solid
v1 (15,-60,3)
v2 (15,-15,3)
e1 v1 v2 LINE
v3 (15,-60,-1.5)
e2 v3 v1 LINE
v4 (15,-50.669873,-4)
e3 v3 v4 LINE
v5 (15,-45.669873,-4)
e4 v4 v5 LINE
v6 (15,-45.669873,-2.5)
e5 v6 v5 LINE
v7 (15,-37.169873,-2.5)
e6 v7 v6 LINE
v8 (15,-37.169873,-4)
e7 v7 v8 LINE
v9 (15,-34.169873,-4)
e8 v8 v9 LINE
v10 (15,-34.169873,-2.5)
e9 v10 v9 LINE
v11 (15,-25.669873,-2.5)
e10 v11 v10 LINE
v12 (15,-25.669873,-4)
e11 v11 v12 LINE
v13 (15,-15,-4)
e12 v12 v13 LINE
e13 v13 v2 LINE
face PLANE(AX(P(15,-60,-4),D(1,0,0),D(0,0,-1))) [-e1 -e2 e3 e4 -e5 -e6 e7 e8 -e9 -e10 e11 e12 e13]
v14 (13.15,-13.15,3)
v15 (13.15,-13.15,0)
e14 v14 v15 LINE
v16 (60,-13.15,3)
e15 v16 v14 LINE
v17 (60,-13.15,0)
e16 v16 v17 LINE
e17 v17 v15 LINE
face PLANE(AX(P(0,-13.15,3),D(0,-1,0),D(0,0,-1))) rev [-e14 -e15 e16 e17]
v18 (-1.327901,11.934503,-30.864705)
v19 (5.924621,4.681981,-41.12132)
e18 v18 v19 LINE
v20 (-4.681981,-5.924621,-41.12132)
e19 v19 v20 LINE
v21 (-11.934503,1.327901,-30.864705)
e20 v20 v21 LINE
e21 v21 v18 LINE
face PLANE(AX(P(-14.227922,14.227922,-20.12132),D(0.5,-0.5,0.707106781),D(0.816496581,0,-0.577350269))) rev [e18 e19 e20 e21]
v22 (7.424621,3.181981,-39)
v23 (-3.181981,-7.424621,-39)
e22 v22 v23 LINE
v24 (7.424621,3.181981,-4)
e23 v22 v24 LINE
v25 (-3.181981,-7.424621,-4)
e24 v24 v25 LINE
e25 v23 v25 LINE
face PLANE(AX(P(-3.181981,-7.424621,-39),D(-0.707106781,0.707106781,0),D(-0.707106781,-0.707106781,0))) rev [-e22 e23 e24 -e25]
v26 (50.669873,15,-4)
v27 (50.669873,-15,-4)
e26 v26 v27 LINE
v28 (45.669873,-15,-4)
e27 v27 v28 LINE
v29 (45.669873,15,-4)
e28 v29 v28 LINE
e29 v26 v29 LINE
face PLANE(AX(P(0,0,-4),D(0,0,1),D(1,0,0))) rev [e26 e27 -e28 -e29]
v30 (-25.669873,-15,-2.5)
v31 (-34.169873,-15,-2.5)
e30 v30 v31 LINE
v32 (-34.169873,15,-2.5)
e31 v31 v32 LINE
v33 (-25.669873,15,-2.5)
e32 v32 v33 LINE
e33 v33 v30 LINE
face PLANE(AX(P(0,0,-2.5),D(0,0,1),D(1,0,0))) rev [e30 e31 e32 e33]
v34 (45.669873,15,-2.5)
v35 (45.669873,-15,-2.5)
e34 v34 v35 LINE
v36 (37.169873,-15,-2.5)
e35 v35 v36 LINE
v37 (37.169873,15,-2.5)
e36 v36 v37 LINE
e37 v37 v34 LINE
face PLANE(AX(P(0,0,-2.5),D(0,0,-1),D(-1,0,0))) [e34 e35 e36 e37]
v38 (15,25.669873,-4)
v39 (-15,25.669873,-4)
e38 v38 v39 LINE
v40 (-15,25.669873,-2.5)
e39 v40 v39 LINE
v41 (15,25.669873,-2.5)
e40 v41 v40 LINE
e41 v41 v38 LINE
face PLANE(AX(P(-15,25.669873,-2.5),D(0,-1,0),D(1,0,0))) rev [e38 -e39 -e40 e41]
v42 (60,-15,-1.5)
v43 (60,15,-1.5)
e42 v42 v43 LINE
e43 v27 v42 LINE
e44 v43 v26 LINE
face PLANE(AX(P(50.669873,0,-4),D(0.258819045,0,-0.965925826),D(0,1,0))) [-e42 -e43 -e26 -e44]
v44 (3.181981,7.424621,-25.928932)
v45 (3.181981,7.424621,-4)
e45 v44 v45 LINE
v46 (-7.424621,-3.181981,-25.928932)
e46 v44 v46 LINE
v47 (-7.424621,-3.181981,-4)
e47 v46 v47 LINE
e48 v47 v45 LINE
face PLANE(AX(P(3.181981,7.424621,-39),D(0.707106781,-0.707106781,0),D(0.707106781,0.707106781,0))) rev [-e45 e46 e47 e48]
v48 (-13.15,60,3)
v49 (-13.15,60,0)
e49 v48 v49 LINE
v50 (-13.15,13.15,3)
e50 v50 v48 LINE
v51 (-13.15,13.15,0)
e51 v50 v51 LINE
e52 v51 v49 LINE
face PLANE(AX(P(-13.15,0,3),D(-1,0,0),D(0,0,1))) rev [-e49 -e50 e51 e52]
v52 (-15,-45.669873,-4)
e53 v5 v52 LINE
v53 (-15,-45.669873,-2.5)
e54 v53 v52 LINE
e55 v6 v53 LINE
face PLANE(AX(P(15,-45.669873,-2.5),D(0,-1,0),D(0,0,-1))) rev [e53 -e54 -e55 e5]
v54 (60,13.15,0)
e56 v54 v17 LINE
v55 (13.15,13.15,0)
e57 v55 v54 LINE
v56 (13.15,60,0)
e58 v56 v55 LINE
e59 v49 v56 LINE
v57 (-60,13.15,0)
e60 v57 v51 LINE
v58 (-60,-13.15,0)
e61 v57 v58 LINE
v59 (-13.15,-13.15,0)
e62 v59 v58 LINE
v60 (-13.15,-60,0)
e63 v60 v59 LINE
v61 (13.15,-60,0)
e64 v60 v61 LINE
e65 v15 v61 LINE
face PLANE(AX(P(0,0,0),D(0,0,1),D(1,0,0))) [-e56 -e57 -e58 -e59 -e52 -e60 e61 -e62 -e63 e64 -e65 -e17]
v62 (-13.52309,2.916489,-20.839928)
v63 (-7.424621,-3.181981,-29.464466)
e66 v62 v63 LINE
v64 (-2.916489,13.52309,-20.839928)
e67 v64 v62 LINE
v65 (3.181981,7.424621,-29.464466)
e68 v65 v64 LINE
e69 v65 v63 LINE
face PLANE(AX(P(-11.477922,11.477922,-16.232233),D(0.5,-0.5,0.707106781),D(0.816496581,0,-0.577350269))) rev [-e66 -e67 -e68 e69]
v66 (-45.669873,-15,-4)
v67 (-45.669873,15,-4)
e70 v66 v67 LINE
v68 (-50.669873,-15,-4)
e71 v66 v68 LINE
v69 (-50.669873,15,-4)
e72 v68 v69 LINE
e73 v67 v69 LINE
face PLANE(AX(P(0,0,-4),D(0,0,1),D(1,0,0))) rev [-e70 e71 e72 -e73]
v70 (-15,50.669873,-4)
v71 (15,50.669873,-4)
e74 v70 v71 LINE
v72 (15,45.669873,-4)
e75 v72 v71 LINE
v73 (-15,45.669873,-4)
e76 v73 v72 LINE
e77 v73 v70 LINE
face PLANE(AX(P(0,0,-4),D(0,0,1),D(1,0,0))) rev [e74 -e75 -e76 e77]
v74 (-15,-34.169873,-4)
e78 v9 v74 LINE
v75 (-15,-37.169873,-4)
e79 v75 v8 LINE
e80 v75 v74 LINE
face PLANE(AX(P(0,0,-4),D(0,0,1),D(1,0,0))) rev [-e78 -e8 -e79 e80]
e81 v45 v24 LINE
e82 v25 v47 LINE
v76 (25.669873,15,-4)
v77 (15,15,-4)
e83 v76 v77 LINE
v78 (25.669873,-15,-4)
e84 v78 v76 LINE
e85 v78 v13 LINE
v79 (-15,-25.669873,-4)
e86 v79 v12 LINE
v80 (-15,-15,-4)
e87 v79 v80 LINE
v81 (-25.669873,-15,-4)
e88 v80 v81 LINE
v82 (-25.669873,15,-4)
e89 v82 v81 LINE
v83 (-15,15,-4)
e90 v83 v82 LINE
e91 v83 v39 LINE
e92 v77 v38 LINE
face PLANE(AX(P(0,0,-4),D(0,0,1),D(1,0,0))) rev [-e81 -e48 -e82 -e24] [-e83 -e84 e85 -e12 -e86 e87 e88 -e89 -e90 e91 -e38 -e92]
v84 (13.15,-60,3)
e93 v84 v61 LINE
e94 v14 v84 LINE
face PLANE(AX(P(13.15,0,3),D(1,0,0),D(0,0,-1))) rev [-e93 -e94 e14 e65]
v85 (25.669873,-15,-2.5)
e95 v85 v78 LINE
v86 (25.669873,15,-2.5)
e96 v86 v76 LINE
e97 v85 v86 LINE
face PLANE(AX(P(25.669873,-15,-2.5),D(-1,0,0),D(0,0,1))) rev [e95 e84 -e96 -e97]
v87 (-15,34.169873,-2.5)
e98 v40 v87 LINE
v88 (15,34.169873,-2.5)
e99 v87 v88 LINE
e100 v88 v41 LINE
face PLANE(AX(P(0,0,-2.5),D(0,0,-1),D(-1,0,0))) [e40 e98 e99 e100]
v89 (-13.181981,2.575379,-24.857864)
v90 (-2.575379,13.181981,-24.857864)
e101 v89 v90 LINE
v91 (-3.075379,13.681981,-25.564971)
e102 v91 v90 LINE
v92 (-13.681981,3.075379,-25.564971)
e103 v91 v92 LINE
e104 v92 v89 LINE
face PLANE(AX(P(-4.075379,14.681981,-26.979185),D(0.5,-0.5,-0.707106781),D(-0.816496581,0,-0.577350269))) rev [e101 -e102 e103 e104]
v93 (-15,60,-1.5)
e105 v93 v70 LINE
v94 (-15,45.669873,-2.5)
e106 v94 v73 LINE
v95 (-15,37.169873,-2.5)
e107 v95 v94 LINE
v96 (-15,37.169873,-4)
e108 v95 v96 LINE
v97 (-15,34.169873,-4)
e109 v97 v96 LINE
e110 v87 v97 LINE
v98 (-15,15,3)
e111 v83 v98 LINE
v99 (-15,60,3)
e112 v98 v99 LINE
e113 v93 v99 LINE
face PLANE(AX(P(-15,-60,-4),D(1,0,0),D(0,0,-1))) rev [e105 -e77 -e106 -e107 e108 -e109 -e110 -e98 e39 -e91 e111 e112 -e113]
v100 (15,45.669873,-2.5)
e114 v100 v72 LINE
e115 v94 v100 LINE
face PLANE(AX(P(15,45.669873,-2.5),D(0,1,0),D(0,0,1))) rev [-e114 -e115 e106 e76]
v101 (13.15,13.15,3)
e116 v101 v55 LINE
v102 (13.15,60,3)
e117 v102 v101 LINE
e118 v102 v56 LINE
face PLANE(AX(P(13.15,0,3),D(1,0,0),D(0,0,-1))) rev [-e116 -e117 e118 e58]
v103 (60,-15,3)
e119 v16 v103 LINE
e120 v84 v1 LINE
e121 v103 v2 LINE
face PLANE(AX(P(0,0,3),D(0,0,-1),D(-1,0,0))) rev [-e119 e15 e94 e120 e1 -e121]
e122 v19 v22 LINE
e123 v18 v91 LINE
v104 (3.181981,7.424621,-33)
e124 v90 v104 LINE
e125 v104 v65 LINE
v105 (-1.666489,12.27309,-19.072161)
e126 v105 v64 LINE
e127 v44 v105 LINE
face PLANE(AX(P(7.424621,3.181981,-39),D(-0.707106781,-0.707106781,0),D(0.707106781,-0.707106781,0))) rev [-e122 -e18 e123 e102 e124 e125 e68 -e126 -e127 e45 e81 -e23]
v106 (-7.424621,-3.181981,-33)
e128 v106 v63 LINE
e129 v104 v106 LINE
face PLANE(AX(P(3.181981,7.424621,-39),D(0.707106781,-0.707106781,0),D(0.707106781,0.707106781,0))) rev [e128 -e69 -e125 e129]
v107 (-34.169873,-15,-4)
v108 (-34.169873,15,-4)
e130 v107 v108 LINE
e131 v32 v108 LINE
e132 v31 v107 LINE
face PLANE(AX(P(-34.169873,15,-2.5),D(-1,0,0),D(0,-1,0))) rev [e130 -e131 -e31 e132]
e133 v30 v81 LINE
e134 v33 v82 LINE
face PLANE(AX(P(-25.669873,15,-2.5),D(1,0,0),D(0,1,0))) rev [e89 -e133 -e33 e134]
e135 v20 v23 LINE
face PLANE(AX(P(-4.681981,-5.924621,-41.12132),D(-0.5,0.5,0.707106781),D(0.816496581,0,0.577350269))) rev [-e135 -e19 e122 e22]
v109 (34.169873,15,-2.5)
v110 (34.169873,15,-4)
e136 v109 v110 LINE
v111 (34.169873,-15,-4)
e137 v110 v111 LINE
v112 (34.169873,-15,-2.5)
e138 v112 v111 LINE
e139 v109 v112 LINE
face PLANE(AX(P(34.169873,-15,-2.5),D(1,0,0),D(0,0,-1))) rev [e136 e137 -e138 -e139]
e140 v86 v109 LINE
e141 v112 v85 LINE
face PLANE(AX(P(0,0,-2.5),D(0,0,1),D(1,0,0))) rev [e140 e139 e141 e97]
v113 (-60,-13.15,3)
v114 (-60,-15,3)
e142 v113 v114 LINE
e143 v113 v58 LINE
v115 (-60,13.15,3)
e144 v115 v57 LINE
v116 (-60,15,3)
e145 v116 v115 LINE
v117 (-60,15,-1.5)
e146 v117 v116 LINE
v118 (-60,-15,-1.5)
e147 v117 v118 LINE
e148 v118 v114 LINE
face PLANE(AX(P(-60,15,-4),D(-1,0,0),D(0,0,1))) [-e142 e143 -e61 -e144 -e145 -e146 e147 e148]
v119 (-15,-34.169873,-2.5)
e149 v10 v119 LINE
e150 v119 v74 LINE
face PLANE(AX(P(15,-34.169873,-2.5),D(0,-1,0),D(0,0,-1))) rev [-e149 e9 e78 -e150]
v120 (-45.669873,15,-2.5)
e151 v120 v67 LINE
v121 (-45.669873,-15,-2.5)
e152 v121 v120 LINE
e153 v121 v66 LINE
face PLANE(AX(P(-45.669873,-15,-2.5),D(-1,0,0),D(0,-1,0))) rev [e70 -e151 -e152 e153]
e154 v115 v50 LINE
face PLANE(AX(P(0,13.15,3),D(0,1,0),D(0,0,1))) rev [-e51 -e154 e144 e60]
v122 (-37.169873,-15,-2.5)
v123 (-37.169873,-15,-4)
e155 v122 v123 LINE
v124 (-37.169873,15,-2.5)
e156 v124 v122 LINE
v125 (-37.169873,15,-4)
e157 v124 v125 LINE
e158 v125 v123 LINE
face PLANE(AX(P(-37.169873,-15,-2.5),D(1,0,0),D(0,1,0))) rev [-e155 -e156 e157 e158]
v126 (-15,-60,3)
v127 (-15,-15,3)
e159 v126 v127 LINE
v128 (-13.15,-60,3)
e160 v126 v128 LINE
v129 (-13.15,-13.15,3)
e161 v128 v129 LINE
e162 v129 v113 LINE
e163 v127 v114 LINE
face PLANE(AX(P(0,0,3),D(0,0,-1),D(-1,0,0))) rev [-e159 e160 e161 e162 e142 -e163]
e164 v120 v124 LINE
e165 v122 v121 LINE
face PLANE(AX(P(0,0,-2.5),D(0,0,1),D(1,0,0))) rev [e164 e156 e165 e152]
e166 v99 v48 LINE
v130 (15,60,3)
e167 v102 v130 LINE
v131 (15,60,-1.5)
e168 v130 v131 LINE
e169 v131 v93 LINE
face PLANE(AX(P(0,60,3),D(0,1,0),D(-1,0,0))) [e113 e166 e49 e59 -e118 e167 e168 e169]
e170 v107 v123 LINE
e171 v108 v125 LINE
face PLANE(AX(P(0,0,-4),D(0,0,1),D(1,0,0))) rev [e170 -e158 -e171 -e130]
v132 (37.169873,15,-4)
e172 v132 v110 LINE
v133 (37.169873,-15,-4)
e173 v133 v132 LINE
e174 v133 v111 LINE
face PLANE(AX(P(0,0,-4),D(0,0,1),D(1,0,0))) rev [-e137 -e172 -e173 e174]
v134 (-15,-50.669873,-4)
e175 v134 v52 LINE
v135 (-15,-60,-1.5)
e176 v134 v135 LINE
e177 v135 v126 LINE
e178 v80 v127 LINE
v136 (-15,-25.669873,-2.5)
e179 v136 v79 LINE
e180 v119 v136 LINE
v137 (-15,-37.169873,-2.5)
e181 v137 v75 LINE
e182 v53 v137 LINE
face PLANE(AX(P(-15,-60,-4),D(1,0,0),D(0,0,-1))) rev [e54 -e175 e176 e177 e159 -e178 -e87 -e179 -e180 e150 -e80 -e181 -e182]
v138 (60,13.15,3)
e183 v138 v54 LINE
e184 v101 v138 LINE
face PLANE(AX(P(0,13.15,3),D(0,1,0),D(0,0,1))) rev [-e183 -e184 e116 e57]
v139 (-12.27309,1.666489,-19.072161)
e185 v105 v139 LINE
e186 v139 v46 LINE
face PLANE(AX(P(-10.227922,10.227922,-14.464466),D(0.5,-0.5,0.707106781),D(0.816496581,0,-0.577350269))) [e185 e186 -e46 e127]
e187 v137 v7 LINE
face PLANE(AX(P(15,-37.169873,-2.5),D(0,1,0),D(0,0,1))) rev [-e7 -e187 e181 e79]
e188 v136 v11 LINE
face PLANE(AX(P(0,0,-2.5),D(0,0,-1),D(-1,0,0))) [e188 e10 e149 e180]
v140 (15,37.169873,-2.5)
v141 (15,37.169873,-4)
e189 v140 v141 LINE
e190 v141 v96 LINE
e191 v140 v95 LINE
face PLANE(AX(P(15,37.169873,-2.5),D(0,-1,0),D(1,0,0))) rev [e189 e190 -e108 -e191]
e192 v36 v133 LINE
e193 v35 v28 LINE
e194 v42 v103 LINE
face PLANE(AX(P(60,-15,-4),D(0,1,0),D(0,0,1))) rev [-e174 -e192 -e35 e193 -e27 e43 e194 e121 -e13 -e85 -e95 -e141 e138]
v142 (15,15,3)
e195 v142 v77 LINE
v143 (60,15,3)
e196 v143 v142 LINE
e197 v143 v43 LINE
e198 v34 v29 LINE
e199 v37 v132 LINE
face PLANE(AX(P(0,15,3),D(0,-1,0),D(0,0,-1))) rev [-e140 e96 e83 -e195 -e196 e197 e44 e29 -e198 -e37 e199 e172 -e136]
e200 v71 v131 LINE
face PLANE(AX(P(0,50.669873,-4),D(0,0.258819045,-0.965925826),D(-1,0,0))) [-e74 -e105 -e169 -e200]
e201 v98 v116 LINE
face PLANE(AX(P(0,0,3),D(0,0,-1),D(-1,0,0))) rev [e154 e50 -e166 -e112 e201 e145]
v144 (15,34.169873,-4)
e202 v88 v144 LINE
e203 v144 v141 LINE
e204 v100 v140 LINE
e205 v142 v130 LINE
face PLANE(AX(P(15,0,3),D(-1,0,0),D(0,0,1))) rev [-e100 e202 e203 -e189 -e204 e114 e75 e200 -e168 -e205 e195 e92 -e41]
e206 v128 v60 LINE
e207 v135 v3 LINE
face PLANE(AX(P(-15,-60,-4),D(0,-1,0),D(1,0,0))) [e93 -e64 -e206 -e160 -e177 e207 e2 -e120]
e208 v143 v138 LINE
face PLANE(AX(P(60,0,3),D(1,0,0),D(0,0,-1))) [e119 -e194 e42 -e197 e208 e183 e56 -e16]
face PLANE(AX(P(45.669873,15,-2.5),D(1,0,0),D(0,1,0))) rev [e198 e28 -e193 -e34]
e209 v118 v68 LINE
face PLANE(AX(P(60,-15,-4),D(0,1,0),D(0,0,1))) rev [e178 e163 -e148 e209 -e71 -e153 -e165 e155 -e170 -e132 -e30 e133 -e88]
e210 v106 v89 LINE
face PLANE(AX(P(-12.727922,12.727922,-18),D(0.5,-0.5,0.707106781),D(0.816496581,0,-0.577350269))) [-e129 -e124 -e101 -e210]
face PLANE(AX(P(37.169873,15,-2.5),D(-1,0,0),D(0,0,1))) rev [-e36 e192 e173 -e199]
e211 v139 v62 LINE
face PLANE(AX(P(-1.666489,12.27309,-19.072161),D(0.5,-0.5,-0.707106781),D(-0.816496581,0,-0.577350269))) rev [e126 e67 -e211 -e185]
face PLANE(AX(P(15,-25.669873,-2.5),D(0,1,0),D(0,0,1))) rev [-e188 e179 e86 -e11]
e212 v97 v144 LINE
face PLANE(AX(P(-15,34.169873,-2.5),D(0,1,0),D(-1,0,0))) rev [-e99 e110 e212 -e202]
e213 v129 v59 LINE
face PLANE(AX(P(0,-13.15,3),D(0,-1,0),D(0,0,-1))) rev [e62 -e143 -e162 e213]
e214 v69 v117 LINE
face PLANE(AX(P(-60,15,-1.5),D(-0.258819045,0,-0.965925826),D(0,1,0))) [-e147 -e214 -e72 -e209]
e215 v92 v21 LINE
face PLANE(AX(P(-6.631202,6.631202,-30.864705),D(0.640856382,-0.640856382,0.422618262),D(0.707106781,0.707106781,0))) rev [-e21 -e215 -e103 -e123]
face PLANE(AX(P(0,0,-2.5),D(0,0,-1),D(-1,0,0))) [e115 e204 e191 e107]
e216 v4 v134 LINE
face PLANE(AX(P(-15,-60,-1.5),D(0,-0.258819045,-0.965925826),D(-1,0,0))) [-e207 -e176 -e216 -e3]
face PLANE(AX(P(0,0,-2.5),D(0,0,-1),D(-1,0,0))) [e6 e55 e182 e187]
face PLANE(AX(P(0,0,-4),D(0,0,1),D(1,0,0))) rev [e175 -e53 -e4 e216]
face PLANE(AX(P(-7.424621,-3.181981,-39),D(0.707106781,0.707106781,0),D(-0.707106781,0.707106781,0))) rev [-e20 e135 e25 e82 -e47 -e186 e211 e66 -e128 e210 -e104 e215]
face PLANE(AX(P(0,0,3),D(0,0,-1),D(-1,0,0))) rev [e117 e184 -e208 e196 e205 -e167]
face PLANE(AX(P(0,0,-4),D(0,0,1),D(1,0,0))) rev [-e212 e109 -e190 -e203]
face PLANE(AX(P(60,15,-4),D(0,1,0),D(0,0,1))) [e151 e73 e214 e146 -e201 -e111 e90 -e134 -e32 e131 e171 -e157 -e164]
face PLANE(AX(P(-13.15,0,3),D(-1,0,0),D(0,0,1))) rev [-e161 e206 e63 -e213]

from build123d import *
from OCP.BRepFilletAPI import BRepFilletAPI_MakeChamfer

# Parameters (mm, degrees)
SKETCH1_W           = 1.85
SKETCH1_H           = 38.85
SKETCH1_H_2         = 6.15
SKETCH1_W_2         = 44.85
SKETCH1_H_3         = 1.85
SKETCH1_W_3         = 0.15
BOSS_EXTRUDE1_DEPTH = 3
SKETCH1_4_W         = 120
SKETCH1_4_H         = 30
SKETCH1_4_W_2       = 30
SKETCH1_4_H_2       = 120
BOSS_EXTRUDE3_DEPTH = 4
CHAMFER1_SIZE       = 2.5
CHAMFER1_SIZE2      = 9.330127019
SKETCH4_W           = 8.5
SKETCH4_H           = 30
SKETCH4_W_2         = 30
SKETCH4_H_2         = 8.5
CUT_EXTRUDE1_DEPTH  = 1.5
BOSS_EXTRUDE4_DEPTH = 35
CHAMFER2_SIZE       = 6
BOSS_EXTRUDE5_DEPTH = 3
CHAMFER3_SIZE       = 2
CHAMFER3_SIZE2      = 5.494954839
BOSS_EXTRUDE6_DEPTH = 2.5


with BuildPart() as part:
    # Sketch1 → Boss-Extrude1 (new body)
    with BuildSketch(Plane(origin=(0, 0, 0), x_dir=(-1, 0, 0), z_dir=(0, 0, -1))):
        with Locations((14.075, 40.575)):
            Rectangle(SKETCH1_W, SKETCH1_H)
        with Locations((14.075, 18.075)):
            Rectangle(SKETCH1_W, SKETCH1_H_2)
        with Locations((37.575, 14.075)):
            Rectangle(SKETCH1_W_2, SKETCH1_H_3)
        with Locations((14.075, 14.075)):
            Rectangle(SKETCH1_W, SKETCH1_H_3)
        with Locations((14.075, -14.075)):
            Rectangle(SKETCH1_W, SKETCH1_H_3)
        with Locations((14.075, -18.075)):
            Rectangle(SKETCH1_W, SKETCH1_H_2)
        with Locations((37.575, -14.075)):
            Rectangle(SKETCH1_W_2, SKETCH1_H_3)
        with Locations((14.075, -40.575)):
            Rectangle(SKETCH1_W, SKETCH1_H)
        with Locations((-14.075, -14.075)):
            Rectangle(SKETCH1_W, SKETCH1_H_3)
        with Locations((-14.075, -18.075)):
            Rectangle(SKETCH1_W, SKETCH1_H_2)
        with Locations((-37.575, -14.075)):
            Rectangle(SKETCH1_W_2, SKETCH1_H_3)
        with Locations((-15.075, -14.075)):
            Rectangle(SKETCH1_W_3, SKETCH1_H_3)
        with Locations((15.075, -14.075)):
            Rectangle(SKETCH1_W_3, SKETCH1_H_3)
        with Locations((15.075, 14.075)):
            Rectangle(SKETCH1_W_3, SKETCH1_H_3)
        with Locations((-37.575, 14.075)):
            Rectangle(SKETCH1_W_2, SKETCH1_H_3)
        with Locations((-15.075, 14.075)):
            Rectangle(SKETCH1_W_3, SKETCH1_H_3)
        with Locations((-14.075, 18.075)):
            Rectangle(SKETCH1_W, SKETCH1_H_2)
        with Locations((-14.075, 14.075)):
            Rectangle(SKETCH1_W, SKETCH1_H_3)
        with Locations((-14.075, 40.575)):
            Rectangle(SKETCH1_W, SKETCH1_H)
        with Locations((-14.075, -40.575)):
            Rectangle(SKETCH1_W, SKETCH1_H)
    extrude(amount=-BOSS_EXTRUDE1_DEPTH)

    # Sketch1<4> → Boss-Extrude3 (add)
    with BuildSketch(Plane(origin=(0, 0, 0), x_dir=(-1, 0, 0), z_dir=(0, 0, -1))):
        Rectangle(SKETCH1_4_W, SKETCH1_4_H)
        Rectangle(SKETCH1_4_W_2, SKETCH1_4_H_2)
    extrude(amount=BOSS_EXTRUDE3_DEPTH)

    # Chamfer1: one chamfer whose edges measure the first distance from different faces: ONE call of the kernel's chamfer builder (chamfer() names one face for all edges)
    chamfer1_edges_1 = [part.edges().sort_by_distance(p)[0] for p in [
        (60, 0, -4),
    ]]
    chamfer1_side_1 = [part.faces().sort_by_distance(p)[0] for p in [
        (60, 0, -1.703661327),
    ]]
    chamfer1_edges_2 = [part.edges().sort_by_distance(p)[0] for p in [
        (0, 60, -4),
    ]]
    chamfer1_side_2 = [part.faces().sort_by_distance(p)[0] for p in [
        (0, 60, -1.703661327),
    ]]
    chamfer1_edges_3 = [part.edges().sort_by_distance(p)[0] for p in [
        (0, -60, -4),
    ]]
    chamfer1_side_3 = [part.faces().sort_by_distance(p)[0] for p in [
        (0, -60, -1.703661327),
    ]]
    chamfer1_edges_4 = [part.edges().sort_by_distance(p)[0] for p in [
        (-60, 0, -4),
    ]]
    chamfer1_side_4 = [part.faces().sort_by_distance(p)[0] for p in [
        (-60, 0, -1.703661327),
    ]]
    chamfer1 = BRepFilletAPI_MakeChamfer(part.part.solid().wrapped)
    for e in chamfer1_edges_1:
        chamfer1.Add(CHAMFER1_SIZE, CHAMFER1_SIZE2, e.wrapped, chamfer1_side_1[0].wrapped)  # the first distance lies on this face
    for e in chamfer1_edges_2:
        chamfer1.Add(CHAMFER1_SIZE, CHAMFER1_SIZE2, e.wrapped, chamfer1_side_2[0].wrapped)  # the first distance lies on this face
    for e in chamfer1_edges_3:
        chamfer1.Add(CHAMFER1_SIZE, CHAMFER1_SIZE2, e.wrapped, chamfer1_side_3[0].wrapped)  # the first distance lies on this face
    for e in chamfer1_edges_4:
        chamfer1.Add(CHAMFER1_SIZE, CHAMFER1_SIZE2, e.wrapped, chamfer1_side_4[0].wrapped)  # the first distance lies on this face
    add(Compound.cast(chamfer1.Shape()), mode=Mode.REPLACE)

    # Sketch4 → Cut-Extrude1 (cut)
    with BuildSketch(Plane(origin=(0, 0, -4), x_dir=(-1, 0, 0), z_dir=(0, 0, -1))):
        with Locations((-41.419872981, 0)):
            Rectangle(SKETCH4_W, SKETCH4_H)
        with Locations((-29.919872981, 0)):
            Rectangle(SKETCH4_W, SKETCH4_H)
        with Locations((0, 41.419872981)):
            Rectangle(SKETCH4_W_2, SKETCH4_H_2)
        with Locations((0, 29.919872981)):
            Rectangle(SKETCH4_W_2, SKETCH4_H_2)
        with Locations((29.919872981, 0)):
            Rectangle(SKETCH4_W, SKETCH4_H)
        with Locations((41.419872981, 0)):
            Rectangle(SKETCH4_W, SKETCH4_H)
        with Locations((0, -29.919872981)):
            Rectangle(SKETCH4_W_2, SKETCH4_H_2)
        with Locations((0, -41.419872981)):
            Rectangle(SKETCH4_W_2, SKETCH4_H_2)
    extrude(amount=-CUT_EXTRUDE1_DEPTH, mode=Mode.SUBTRACT)

    # Sketch5 → Boss-Extrude4 (add)
    with BuildSketch(Plane(origin=(0, 0, -4), x_dir=(-1, 0, 0), z_dir=(0, 0, -1))):
        Polygon((-7.424621202, 3.181980515), (-3.181980515, 7.424621202), (7.424621202, -3.181980515), (3.181980515, -7.424621202), align=None)
    extrude(amount=BOSS_EXTRUDE4_DEPTH)

    # Chamfer2
    chamfer2_edges = [part.edges().sort_by_distance(p)[0] for p in [
        (-2.121320344, 2.121320344, -39),
    ]]
    chamfer(chamfer2_edges, length=CHAMFER2_SIZE - 0.0001)  # a hair under: the kernel refuses the full size

    # Sketch6 → Boss-Extrude5 (add)
    with BuildSketch(Plane(origin=(-12.727922061, 12.727922061, -18), x_dir=(-0.8660254037844379, -0.28867513459481464, 0.4082482904638634), z_dir=(-0.5000000000000013, 0.5000000000000013, -0.7071067811865458))):
        Polygon((-23.270152556, -19.918584287), (-11.723147173, -3.588652668), (0.524301541, -12.248906706), (-11.022703843, -28.578838325), align=None)
    extrude(amount=BOSS_EXTRUDE5_DEPTH)

    # Chamfer3
    chamfer3_edges = [part.edges().sort_by_distance(p)[0] for p in [
        (-9.378679656, 9.378679656, -26.97918472),
    ]]
    chamfer3_side = [part.faces().sort_by_distance(p)[0] for p in [
        (-8.628679656, 8.628679656, -25.918524548),
    ]]
    chamfer(chamfer3_edges, length=CHAMFER3_SIZE, length2=CHAMFER3_SIZE2, reference=chamfer3_side[0])

    # Sketch8 → Boss-Extrude6 (add)
    with BuildSketch(Plane(origin=(-11.477922061, 11.477922061, -16.232233047), x_dir=(0.8660254037844378, 0.28867513459481475, -0.4082482904638635), z_dir=(0.5000000000000016, -0.5000000000000013, 0.7071067811865456))):
        Polygon((6.123724357, -21.650635095), (18.371173071, -12.990381057), (9.885891697, -0.990381057), (-2.361557017, -9.650635095), align=None)
    extrude(amount=BOSS_EXTRUDE6_DEPTH)


solid = part.part
